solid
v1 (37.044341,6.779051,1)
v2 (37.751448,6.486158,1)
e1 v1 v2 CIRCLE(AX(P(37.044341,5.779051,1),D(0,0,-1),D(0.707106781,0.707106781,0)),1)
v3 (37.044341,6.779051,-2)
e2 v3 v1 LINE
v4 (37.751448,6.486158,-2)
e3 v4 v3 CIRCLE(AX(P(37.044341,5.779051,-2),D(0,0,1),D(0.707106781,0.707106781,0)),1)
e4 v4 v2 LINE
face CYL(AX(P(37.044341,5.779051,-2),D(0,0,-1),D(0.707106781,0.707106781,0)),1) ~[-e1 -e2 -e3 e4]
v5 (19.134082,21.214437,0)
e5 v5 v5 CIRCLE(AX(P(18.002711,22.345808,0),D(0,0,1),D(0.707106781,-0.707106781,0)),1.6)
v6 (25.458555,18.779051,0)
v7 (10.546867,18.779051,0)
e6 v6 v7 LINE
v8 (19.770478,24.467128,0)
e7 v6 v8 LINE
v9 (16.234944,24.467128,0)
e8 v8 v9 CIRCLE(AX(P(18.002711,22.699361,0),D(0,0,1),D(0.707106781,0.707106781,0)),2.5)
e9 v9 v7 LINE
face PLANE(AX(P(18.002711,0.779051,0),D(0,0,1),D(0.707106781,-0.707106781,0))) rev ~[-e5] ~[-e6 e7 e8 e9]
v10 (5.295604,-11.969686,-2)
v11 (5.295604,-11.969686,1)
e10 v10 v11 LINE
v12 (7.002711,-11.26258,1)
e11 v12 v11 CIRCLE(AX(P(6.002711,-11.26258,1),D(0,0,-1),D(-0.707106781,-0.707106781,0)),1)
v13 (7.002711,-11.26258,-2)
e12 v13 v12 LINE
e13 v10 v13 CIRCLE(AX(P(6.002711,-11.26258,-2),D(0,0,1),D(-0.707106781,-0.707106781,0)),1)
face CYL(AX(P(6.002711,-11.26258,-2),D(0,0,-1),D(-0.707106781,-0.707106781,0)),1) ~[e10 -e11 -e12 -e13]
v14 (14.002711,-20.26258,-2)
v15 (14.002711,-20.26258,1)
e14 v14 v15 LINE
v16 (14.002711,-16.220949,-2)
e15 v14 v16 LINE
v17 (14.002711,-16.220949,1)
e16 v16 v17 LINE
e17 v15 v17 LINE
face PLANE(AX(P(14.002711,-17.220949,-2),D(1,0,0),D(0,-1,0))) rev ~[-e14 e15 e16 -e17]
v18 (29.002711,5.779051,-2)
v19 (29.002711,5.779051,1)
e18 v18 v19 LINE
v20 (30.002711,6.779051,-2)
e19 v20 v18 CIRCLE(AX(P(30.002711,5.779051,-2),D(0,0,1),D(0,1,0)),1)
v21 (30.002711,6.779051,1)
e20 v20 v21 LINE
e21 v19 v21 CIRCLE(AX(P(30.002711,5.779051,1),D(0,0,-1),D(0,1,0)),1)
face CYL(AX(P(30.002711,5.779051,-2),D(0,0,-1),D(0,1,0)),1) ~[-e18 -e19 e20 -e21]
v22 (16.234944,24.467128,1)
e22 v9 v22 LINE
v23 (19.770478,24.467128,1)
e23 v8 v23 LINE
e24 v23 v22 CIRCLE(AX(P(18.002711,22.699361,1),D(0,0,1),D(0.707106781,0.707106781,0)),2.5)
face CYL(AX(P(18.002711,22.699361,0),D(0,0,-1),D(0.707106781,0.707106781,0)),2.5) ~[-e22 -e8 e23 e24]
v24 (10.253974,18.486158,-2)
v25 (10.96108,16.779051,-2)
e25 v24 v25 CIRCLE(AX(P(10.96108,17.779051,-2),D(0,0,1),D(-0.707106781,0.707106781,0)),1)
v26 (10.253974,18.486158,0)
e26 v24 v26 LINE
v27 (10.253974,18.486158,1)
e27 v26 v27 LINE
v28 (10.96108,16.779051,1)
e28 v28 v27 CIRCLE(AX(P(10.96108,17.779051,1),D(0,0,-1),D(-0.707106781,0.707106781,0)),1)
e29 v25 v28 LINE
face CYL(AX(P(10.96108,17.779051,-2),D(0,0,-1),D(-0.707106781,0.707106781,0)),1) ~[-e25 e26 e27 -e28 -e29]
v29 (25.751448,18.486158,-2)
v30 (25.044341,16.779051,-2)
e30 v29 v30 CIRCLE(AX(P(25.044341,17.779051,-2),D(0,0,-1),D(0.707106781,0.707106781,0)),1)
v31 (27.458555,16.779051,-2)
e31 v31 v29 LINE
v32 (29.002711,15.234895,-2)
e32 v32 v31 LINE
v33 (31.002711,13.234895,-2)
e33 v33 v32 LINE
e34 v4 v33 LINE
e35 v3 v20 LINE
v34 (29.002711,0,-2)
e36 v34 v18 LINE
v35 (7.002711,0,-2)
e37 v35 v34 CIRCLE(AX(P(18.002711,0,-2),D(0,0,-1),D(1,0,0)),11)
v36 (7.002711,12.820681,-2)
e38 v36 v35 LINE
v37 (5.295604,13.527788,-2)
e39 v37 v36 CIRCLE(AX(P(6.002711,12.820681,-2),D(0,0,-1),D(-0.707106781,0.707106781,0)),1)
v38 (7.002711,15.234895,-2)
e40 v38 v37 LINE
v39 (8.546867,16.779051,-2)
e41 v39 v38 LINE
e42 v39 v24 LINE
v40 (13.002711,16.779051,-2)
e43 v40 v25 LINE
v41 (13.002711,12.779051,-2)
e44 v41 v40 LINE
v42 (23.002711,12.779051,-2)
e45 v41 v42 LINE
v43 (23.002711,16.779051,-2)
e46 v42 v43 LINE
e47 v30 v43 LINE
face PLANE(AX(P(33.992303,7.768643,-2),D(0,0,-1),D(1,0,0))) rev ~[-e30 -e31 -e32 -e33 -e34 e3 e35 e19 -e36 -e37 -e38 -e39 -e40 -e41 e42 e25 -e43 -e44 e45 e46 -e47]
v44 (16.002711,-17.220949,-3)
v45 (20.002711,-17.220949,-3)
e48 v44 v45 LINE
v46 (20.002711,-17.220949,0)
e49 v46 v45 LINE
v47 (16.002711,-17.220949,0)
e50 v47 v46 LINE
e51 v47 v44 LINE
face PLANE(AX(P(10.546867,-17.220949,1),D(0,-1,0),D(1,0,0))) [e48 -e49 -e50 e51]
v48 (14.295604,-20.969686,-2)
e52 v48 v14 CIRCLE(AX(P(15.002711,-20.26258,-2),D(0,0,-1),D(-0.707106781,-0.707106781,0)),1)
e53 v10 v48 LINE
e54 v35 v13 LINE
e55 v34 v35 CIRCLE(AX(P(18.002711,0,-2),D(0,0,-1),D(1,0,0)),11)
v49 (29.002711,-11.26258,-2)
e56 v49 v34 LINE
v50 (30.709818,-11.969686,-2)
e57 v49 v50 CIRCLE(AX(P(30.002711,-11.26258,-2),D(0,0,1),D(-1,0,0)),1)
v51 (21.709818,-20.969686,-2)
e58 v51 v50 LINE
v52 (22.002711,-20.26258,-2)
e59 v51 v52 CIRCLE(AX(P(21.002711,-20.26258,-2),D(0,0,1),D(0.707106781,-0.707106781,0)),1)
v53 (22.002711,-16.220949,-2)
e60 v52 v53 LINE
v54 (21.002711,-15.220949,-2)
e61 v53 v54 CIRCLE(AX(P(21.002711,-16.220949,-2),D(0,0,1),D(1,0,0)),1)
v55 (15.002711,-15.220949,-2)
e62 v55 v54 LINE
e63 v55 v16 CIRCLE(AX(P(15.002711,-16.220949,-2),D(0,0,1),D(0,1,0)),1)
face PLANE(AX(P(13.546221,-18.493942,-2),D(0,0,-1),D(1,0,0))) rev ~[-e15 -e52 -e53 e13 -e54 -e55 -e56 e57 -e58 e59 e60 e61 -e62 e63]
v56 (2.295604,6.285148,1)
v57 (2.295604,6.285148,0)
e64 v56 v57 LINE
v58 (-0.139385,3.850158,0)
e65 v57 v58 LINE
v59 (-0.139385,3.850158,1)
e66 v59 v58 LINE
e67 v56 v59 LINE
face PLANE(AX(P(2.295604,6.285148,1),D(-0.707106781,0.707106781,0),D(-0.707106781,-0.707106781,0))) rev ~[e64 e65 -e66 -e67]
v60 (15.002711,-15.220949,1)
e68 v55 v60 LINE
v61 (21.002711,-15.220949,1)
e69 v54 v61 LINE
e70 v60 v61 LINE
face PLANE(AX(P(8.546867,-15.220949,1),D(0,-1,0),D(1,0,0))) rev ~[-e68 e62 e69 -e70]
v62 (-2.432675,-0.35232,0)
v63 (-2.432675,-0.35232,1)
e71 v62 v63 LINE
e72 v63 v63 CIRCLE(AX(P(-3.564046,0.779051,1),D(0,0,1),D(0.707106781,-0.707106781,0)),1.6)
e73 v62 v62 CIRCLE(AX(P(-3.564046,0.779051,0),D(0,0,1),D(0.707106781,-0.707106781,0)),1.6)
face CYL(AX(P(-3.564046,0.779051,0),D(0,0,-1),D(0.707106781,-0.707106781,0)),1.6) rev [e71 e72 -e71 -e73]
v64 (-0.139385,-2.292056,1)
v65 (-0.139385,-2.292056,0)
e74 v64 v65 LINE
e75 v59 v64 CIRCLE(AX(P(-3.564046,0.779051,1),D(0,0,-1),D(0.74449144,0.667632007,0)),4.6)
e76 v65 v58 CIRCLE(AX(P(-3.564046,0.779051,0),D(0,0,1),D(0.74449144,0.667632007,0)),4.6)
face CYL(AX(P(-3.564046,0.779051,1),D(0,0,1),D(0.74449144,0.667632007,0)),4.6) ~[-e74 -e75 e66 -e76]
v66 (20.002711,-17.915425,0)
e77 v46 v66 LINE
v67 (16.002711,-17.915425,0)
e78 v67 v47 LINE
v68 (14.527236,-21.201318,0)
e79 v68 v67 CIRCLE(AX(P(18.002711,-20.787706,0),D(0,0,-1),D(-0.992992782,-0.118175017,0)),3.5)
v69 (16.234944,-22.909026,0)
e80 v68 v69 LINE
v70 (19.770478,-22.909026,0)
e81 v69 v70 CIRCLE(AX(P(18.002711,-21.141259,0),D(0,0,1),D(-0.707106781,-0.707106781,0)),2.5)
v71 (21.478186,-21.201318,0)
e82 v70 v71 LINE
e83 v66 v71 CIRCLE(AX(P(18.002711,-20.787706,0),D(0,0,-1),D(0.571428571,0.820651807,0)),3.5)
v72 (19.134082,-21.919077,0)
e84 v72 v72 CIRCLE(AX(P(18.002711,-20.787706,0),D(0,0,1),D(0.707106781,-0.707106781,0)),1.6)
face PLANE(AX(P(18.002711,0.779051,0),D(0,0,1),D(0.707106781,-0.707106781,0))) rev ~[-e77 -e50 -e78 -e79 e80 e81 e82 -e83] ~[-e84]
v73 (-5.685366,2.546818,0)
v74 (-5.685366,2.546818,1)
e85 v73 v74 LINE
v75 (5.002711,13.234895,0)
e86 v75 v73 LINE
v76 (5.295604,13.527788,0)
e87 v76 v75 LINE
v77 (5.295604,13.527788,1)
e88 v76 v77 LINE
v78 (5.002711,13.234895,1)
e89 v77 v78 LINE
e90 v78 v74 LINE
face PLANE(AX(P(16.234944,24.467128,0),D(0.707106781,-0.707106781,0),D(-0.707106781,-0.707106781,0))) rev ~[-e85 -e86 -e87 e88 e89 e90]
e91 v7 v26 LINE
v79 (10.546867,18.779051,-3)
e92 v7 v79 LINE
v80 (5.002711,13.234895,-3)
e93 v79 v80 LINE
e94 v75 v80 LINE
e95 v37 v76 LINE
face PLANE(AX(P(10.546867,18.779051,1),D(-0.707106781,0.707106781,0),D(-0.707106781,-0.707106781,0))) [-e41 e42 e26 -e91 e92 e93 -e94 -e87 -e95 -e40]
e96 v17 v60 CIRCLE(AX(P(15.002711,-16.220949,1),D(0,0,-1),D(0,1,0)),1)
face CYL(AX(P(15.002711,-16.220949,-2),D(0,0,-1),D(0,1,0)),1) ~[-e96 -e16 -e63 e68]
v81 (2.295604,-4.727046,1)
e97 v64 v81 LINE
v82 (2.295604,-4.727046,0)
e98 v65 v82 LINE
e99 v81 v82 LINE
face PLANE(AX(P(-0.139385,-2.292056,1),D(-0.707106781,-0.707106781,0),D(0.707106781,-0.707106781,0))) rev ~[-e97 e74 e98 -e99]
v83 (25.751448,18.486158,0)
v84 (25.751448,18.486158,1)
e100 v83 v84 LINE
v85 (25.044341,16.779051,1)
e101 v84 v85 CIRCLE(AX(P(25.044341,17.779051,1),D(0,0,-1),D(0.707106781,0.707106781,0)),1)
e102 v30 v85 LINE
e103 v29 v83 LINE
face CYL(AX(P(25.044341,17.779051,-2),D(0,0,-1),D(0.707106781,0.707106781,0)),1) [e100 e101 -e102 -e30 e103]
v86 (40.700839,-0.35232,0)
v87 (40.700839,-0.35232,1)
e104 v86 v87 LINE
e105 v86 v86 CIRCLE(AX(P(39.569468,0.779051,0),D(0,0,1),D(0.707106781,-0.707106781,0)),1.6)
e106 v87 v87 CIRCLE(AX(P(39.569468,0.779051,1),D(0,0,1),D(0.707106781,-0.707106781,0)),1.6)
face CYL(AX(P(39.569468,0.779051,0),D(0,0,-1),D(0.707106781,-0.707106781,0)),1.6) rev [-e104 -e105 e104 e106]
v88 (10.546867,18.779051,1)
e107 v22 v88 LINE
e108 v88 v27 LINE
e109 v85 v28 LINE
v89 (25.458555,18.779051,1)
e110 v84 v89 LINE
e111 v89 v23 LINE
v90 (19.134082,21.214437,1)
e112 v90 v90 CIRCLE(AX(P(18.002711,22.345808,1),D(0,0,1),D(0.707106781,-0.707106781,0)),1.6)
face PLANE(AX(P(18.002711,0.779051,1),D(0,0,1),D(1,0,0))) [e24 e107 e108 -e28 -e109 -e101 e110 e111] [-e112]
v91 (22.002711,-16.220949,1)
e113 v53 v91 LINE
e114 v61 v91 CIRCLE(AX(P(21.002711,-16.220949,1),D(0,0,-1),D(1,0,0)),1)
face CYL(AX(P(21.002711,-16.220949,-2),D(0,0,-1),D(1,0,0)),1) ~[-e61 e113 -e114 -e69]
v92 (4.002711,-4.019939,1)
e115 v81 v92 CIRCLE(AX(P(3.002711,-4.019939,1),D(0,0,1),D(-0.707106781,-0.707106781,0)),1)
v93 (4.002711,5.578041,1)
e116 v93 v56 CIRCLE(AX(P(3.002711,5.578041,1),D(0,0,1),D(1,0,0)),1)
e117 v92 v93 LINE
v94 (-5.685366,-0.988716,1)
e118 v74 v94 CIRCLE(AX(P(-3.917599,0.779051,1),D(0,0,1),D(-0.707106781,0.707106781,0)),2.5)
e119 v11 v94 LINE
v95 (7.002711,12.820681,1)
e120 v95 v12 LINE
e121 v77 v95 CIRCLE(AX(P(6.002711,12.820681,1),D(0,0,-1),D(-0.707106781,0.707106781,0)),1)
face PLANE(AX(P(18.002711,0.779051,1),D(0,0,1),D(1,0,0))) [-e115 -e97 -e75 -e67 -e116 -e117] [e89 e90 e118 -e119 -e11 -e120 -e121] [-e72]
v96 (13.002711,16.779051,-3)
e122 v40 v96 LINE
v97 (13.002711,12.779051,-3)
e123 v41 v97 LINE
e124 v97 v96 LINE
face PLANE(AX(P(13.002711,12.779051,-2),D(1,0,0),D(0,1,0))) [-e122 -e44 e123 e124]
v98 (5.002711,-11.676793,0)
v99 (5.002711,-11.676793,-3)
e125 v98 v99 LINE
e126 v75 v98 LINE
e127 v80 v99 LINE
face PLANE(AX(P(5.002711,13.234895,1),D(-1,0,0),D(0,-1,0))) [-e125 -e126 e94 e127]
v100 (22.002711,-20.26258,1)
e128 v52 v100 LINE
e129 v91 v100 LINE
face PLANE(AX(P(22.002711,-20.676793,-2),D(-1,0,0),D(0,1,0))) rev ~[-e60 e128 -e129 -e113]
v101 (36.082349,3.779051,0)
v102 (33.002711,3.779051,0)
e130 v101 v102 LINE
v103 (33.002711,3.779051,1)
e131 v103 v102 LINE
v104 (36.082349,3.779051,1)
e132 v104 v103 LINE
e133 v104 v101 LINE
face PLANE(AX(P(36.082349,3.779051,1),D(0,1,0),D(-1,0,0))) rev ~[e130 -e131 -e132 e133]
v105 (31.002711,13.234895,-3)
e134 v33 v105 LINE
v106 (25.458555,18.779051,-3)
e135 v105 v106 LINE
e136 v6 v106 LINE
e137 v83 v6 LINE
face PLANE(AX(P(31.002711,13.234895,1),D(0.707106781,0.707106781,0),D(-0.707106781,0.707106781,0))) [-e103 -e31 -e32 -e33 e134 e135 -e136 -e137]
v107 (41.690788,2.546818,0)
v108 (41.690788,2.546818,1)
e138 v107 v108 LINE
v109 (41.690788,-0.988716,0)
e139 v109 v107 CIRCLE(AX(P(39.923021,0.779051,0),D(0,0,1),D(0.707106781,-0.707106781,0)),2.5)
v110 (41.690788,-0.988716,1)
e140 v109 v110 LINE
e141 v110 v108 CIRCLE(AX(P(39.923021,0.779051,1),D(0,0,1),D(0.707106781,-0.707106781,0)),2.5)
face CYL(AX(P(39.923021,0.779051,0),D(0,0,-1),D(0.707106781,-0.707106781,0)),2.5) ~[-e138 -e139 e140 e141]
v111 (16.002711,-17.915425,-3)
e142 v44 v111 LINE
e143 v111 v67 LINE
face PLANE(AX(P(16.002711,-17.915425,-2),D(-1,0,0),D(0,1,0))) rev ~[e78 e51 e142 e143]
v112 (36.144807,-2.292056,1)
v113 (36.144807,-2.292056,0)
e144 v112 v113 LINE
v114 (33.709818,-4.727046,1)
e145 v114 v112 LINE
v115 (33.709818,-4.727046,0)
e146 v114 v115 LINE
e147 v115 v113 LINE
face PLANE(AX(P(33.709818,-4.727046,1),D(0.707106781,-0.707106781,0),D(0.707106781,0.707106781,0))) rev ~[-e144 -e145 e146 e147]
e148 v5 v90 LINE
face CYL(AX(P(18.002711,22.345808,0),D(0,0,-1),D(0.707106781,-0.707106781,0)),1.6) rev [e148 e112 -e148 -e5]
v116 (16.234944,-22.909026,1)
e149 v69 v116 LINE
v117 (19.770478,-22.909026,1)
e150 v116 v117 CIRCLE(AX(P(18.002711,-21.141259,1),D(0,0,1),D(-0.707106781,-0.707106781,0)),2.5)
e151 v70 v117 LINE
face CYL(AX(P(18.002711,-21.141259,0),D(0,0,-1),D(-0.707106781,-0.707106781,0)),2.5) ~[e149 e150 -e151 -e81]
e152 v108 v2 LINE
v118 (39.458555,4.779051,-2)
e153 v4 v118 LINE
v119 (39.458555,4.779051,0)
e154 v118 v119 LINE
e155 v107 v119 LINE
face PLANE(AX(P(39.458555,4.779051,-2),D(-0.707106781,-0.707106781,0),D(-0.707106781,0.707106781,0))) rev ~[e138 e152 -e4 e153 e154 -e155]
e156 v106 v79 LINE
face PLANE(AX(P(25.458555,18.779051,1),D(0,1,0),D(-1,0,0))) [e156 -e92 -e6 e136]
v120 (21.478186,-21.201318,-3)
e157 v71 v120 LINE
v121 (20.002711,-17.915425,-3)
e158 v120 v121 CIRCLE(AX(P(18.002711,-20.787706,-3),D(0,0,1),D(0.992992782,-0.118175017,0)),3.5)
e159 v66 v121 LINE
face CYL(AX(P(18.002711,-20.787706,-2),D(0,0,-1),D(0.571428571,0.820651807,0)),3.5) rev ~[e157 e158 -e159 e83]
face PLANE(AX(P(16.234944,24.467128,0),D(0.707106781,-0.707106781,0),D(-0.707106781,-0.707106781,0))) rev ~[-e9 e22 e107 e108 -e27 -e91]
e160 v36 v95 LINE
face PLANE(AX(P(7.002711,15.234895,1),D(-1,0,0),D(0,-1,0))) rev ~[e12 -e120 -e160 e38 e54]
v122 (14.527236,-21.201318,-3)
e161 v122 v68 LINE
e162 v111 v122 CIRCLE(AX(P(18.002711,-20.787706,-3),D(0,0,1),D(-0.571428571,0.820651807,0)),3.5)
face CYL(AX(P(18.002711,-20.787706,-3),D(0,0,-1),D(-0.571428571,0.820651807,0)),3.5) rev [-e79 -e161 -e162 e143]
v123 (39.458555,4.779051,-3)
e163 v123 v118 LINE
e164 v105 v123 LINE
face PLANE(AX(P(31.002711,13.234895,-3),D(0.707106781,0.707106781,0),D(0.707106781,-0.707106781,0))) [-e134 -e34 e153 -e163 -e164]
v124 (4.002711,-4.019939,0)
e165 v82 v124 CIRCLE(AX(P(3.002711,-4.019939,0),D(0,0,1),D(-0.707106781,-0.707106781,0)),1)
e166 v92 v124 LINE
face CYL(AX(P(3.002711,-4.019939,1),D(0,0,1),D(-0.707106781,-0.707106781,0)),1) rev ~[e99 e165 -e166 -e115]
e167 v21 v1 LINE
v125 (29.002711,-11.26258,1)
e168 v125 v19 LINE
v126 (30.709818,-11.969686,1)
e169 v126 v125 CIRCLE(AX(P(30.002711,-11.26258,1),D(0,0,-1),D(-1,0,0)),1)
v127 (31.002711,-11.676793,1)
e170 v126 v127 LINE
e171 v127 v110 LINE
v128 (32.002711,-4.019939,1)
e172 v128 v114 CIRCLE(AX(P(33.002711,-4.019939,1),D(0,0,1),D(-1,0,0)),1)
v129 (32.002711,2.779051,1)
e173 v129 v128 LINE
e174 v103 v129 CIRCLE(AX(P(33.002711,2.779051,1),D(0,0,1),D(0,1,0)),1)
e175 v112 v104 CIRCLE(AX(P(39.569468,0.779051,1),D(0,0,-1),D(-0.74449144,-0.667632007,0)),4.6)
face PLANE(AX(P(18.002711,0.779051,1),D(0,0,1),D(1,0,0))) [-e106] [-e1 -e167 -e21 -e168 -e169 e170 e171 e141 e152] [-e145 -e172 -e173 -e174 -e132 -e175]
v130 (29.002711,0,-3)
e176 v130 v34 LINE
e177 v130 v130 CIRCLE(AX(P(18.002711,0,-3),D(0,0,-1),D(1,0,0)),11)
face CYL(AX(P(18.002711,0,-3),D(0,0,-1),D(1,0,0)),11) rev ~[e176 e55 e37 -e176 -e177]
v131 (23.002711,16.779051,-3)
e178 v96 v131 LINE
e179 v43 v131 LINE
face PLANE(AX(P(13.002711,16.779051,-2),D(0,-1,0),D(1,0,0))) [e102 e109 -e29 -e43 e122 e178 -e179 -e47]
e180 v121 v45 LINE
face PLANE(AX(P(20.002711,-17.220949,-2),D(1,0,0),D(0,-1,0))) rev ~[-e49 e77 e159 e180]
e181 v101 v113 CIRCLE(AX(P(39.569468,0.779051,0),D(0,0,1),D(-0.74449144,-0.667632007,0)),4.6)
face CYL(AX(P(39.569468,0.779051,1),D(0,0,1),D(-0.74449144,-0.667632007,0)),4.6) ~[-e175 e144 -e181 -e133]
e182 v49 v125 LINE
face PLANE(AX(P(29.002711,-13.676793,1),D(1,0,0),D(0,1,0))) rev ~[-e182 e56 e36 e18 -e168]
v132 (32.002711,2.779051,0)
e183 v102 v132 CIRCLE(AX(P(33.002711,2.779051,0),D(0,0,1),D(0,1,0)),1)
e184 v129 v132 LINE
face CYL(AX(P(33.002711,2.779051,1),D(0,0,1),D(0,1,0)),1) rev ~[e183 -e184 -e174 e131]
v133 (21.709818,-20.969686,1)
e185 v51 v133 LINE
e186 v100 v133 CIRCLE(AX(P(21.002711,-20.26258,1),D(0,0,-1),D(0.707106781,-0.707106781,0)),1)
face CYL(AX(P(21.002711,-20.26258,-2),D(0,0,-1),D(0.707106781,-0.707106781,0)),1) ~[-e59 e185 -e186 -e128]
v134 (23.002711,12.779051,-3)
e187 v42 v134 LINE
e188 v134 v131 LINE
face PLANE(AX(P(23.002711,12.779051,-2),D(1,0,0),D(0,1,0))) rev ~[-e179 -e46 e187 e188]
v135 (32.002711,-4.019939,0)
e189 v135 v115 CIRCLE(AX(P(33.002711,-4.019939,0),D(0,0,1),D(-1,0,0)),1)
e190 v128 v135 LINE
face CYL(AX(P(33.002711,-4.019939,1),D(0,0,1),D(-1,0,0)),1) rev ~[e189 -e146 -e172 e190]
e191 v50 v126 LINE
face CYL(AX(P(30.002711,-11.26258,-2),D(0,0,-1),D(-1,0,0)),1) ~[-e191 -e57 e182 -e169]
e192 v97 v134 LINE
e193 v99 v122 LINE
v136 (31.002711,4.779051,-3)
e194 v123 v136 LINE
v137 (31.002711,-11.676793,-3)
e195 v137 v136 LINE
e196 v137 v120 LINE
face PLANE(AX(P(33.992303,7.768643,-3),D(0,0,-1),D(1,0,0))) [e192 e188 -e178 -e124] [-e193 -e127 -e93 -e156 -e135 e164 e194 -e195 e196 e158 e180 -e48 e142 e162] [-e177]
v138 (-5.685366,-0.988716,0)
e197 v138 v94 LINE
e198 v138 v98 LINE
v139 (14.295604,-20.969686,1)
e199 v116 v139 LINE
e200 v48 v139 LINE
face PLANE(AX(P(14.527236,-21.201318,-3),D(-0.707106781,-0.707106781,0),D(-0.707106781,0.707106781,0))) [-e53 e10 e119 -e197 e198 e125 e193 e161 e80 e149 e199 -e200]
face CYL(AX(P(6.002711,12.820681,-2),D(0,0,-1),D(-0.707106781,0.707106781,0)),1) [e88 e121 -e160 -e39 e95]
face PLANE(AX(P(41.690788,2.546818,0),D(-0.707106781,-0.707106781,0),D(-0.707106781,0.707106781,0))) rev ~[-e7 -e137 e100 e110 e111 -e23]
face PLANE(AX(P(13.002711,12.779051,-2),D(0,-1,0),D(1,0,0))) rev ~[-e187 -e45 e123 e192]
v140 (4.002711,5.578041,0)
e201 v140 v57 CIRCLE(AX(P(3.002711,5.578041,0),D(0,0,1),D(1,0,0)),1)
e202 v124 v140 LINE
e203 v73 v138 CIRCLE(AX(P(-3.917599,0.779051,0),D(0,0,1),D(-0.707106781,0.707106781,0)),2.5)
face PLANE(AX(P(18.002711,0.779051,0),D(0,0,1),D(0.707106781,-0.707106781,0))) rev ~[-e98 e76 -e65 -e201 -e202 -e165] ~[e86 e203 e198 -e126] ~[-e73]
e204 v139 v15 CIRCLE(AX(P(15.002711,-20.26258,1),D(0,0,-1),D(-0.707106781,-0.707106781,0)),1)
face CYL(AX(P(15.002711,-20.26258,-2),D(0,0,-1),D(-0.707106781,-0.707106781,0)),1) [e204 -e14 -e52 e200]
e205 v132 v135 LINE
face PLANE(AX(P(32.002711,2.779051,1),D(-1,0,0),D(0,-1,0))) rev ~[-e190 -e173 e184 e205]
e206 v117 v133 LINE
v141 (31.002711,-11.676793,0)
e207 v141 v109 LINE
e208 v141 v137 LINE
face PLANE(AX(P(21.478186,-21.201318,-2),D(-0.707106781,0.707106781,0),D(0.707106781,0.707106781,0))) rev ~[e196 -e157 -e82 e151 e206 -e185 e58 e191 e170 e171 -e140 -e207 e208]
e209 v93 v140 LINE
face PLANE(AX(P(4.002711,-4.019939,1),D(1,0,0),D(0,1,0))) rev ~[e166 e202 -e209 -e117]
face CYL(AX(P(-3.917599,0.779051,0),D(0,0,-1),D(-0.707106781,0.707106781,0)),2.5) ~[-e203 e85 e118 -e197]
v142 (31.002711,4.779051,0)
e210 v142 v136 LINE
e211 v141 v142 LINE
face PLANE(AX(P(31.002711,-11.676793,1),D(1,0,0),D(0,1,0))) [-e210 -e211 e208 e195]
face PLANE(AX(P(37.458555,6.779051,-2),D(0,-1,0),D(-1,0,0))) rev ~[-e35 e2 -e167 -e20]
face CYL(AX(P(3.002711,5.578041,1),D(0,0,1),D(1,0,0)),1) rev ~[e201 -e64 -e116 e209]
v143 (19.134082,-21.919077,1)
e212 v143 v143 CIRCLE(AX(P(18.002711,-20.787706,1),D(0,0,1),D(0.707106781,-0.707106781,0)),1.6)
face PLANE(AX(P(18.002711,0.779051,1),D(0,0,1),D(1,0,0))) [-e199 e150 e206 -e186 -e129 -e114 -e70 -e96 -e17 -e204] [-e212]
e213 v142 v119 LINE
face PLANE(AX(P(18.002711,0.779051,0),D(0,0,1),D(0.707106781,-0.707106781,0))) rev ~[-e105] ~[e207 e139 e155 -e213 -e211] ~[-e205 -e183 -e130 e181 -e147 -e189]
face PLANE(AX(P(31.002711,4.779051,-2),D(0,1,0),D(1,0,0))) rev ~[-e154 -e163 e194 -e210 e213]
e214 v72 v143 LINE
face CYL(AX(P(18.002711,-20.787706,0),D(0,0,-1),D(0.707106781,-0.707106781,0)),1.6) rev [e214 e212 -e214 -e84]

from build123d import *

# Parameters (mm, degrees)
F0_R         = 1.6
F1_DEPTH     = 1
F2_ANGLE     = 45
F3_DEPTH     = 4
F5_DEPTH     = 3
F20_DEPTH    = 3
F7_R         = 11
F8_DEPTH     = 25
F9_DEPTH     = 3
F10_W        = 10
F10_H        = 4
F11_DEPTH    = 25
F13_DEPTH    = 25
F14_DEPTH    = 1
F15_DEPTH    = 2
F16_DEPTH    = 1
F17_DEPTH    = 2
F18_T1_DEPTH = 5.5
F18_T3_DEPTH = 9.0355339059
F18_T5_DEPTH = 4.0355339059


# Not quite as in the source:
# - a fillet or chamfer that OpenCascade refuses, or shapes differently, is made with other operations: its cross-section is extruded or revolved along the edge and cut away or added


with BuildPart() as f1:
    # F0 (on Top) → F1 (new body)
    with BuildSketch(Plane.XY):
        with BuildLine():
            Line((-14.7650561035, -22.9090262799), (16.2349438965, -22.9090262799))
            ThreePointArc((16.2349438965, -22.9090262799), (18.0027108495, -22.1767932329), (18.7349438965, -20.4090262799))
            Line((18.7349438965, -20.4090262799), (18.7349438965, 10.5909737201))
            ThreePointArc((18.7349438965, 10.5909737201), (18.0027108495, 12.3587406731), (16.2349438965, 13.0909737201))
            Line((16.2349438965, 13.0909737201), (-14.7650561035, 13.0909737201))
            ThreePointArc((-14.7650561035, 13.0909737201), (-16.5328230564, 12.3587406731), (-17.2650561035, 10.5909737201))
            Line((-17.2650561035, 10.5909737201), (-17.2650561035, -20.4090262799))
            ThreePointArc((-17.2650561035, -20.4090262799), (-16.5328230564, -22.1767932329), (-14.7650561035, -22.9090262799))
        make_face()
        with Locations((-14.5150561035, -20.1590262799)):
            Circle(F0_R, mode=Mode.SUBTRACT)
        with Locations((15.9849438965, -20.1590262799)):
            Circle(F0_R, mode=Mode.SUBTRACT)
        with Locations((-14.5150561035, 10.3409737201)):
            Circle(F0_R, mode=Mode.SUBTRACT)
        with Locations((15.9849438965, 10.3409737201)):
            Circle(F0_R, mode=Mode.SUBTRACT)
    extrude(amount=F1_DEPTH)


with BuildPart() as f1_1:
    # F2: moved
    add(f1.part.rotate(Axis((16.2349438965, -22.9090262799, 0.5), (0, 0, -1)), F2_ANGLE))

    # F19 (on face) → F3 (join)
    with BuildSketch(Plane.XY.offset(1)):
        Polygon((10.5468667268, -17.2209491102), (25.4585549722, -17.2209491102), (31.0027108495, -11.6767932329), (31.0027108495, 13.2348950126), (25.4585549722, 18.7790508898), (10.5468667268, 18.7790508898), (5.0027108495, 13.2348950126), (5.0027108495, -11.6767932329), align=None)
    extrude(amount=-F3_DEPTH)

    # F4 (on face) → F5 (cut)
    with BuildSketch(Plane.XY.offset(1)):
        Polygon((8.5468667268, -15.2209491102), (27.4585549722, -15.2209491102), (29.0027108495, -13.6767932329), (29.0027108495, 15.2348950126), (27.4585549722, 16.7790508898), (8.5468667268, 16.7790508898), (7.0027108495, 15.2348950126), (7.0027108495, -13.6767932329), align=None)
    extrude(amount=-F5_DEPTH, mode=Mode.SUBTRACT)

    # F6 (on face) → F20 (cut, through all)
    with BuildSketch(Plane.XY.offset(1)):
        Polygon((14.0027108495, -20.6767932329), (14.0027108495, -15.2209491102), (8.5468667268, -15.2209491102), align=None)
        Polygon((27.4585549722, -15.2209491102), (22.0027108495, -15.2209491102), (22.0027108495, -20.6767932329), align=None)
    extrude(amount=-F20_DEPTH, mode=Mode.SUBTRACT)

    # F7 (on face) → F8 (cut)
    with BuildSketch(Plane(origin=(0, 0, -3), x_dir=(1, 0, 0), z_dir=(0, 0, -1))):
        with Locations((18.0027108495, 0)):
            Circle(F7_R)
    extrude(amount=-F8_DEPTH, mode=Mode.SUBTRACT)

    # F21 (on face) → F9 (cut, through all)
    with BuildSketch(Plane.XY.offset(1)):
        Polygon((29.0027108495, 15.2348950126), (29.0027108495, 6.7790508898), (37.4585549722, 6.7790508898), align=None)
    extrude(amount=-F9_DEPTH, mode=Mode.SUBTRACT)

    # F10 (on face) → F11 (cut)
    with BuildSketch(Plane.XY.offset(-2)):
        with Locations((18.0027108495, 14.7790508898)):
            Rectangle(F10_W, F10_H)
    extrude(amount=-F11_DEPTH, mode=Mode.SUBTRACT)

    # F12 (on face) + F22 (on face) → F13 (cut)
    with BuildSketch(Plane.XY.offset(1)):
        with BuildLine():
            ThreePointArc((36.1448070539, -2.2920563414), (34.9697110872, 0.7317293655), (36.0823485209, 3.7790508898))
            Line((36.0823485209, 3.7790508898), (33.0027108495, 3.7790508898))
            ThreePointArc((33.0027108495, 3.7790508898), (32.2956040683, 3.486157671), (32.0027108495, 2.7790508898))
            Line((32.0027108495, 2.7790508898), (32.0027108495, -4.0199389834))
            ThreePointArc((32.0027108495, -4.0199389834), (32.6200274171, -4.9438185159), (33.7098176307, -4.7270457646))
            Line((33.7098176307, -4.7270457646), (36.1448070539, -2.2920563414))
        make_face()
    with BuildSketch(Plane.XY.offset(1)):
        with BuildLine():
            ThreePointArc((-0.1393853549, 3.8501581211), (1.0359540233, 0.7790508898), (-0.1393853549, -2.2920563414))
            Line((-0.1393853549, -2.2920563414), (2.2956040683, -4.7270457646))
            ThreePointArc((2.2956040683, -4.7270457646), (3.3853942819, -4.9438185159), (4.0027108495, -4.0199389834))
            Line((4.0027108495, -4.0199389834), (4.0027108495, 5.5780407631))
            ThreePointArc((4.0027108495, 5.5780407631), (3.3853942819, 6.5019202956), (2.2956040683, 6.2851475443))
            Line((2.2956040683, 6.2851475443), (-0.1393853549, 3.8501581211))
        make_face()
    extrude(amount=-F13_DEPTH, mode=Mode.SUBTRACT)

    # F23 (on face) → F14 (join, through all)
    with BuildSketch(Plane(origin=(0, 0, -3), x_dir=(1, 0, 0), z_dir=(0, 0, -1))):
        with BuildLine():
            Line((14.527236112, 21.2013184954), (10.5468667268, 17.2209491102))
            Line((10.5468667268, 17.2209491102), (16.0027108495, 17.2209491102))
            Line((16.0027108495, 17.2209491102), (16.0027108495, 17.9154246131))
            ThreePointArc((16.0027108495, 17.9154246131), (14.809831185, 19.3539976507), (14.527236112, 21.2013184954))
        make_face()
        with BuildLine():
            Line((20.0027108495, 17.9154246131), (20.0027108495, 17.2209491102))
            Line((20.0027108495, 17.2209491102), (25.4585549722, 17.2209491102))
            Line((25.4585549722, 17.2209491102), (21.478185587, 21.2013184954))
            ThreePointArc((21.478185587, 21.2013184954), (21.195590514, 19.3539976507), (20.0027108495, 17.9154246131))
        make_face()
    extrude(amount=-F14_DEPTH)

    # F24 (on face) → F15 (join, through all)
    with BuildSketch(Plane.XY.offset(-2)):
        with BuildLine():
            Line((22.0027108495, -20.6767932329), (22.0027108495, -17.2209491102))
            Line((22.0027108495, -17.2209491102), (20.0027108495, -17.2209491102))
            Line((20.0027108495, -17.2209491102), (20.0027108495, -17.9154246131))
            ThreePointArc((20.0027108495, -17.9154246131), (21.195590514, -19.3539976507), (21.478185587, -21.2013184954))
            Line((21.478185587, -21.2013184954), (22.0027108495, -20.6767932329))
        make_face()
        with BuildLine():
            Line((16.0027108495, -17.2209491102), (14.0027108495, -17.2209491102))
            Line((14.0027108495, -17.2209491102), (14.0027108495, -20.6767932329))
            Line((14.0027108495, -20.6767932329), (14.527236112, -21.2013184954))
            ThreePointArc((14.527236112, -21.2013184954), (14.809831185, -19.3539976507), (16.0027108495, -17.9154246131))
            Line((16.0027108495, -17.9154246131), (16.0027108495, -17.2209491102))
        make_face()
    extrude(amount=F15_DEPTH)

    # F25 (on face) → F16 (join, through all)
    with BuildSketch(Plane(origin=(0, 0, -3), x_dir=(1, 0, 0), z_dir=(0, 0, -1))):
        Polygon((31.0027108495, -4.7790508898), (31.0027108495, -13.2348950126), (39.4585549722, -4.7790508898), align=None)
    extrude(amount=-F16_DEPTH)

    # F26 (on face) → F17 (join, through all)
    with BuildSketch(Plane.XY.offset(-2)):
        Polygon((37.4585549722, 6.7790508898), (31.0027108495, 6.7790508898), (31.0027108495, 4.7790508898), (39.4585549722, 4.7790508898), align=None)
    extrude(amount=F17_DEPTH)

    # F18: fillet of radius 1 on 11 edges, made by hand

    # F18_s2 → F18_t1 (cut)
    with BuildSketch(Plane.XY.offset(-2)):
        with BuildLine():
            ThreePointArc((22.0027108495, -16.2209491102), (21.7098176307, -15.513842329), (21.0027108495, -15.2209491102))
            Line((21.0027108495, -15.2209491102), (22.0027108495, -15.2209491102))
            Line((22.0027108495, -15.2209491102), (22.0027108495, -16.2209491102))
        make_face()
        with BuildLine():
            ThreePointArc((15.0027108495, -15.2209491102), (14.2956040683, -15.513842329), (14.0027108495, -16.2209491102))
            Line((14.0027108495, -16.2209491102), (14.0027108495, -15.2209491102))
            Line((14.0027108495, -15.2209491102), (15.0027108495, -15.2209491102))
        make_face()
        with BuildLine():
            ThreePointArc((30.0027108495, 6.7790508898), (29.2956040683, 6.486157671), (29.0027108495, 5.7790508898))
            Line((29.0027108495, 5.7790508898), (29.0027108495, 6.7790508898))
            Line((29.0027108495, 6.7790508898), (30.0027108495, 6.7790508898))
        make_face()
    extrude(amount=F18_T1_DEPTH, mode=Mode.SUBTRACT)

    # F18_s4 → F18_t3 (cut)
    with BuildSketch(Plane.XY.offset(-2)):
        with BuildLine():
            ThreePointArc((5.2956040683, -11.9696864517), (6.3853942819, -12.186459203), (7.0027108495, -11.2625796705))
            Line((7.0027108495, -11.2625796705), (7.0027108495, -13.6767932329))
            Line((7.0027108495, -13.6767932329), (5.2956040683, -11.9696864517))
        make_face()
        with BuildLine():
            ThreePointArc((5.2956040683, 13.5277882314), (6.3853942819, 13.7445609827), (7.0027108495, 12.8206814502))
            Line((7.0027108495, 12.8206814502), (7.0027108495, 15.2348950126))
            Line((7.0027108495, 15.2348950126), (5.2956040683, 13.5277882314))
        make_face()
        with BuildLine():
            ThreePointArc((29.0027108495, -11.2625796705), (29.6200274171, -12.186459203), (30.7098176307, -11.9696864517))
            Line((30.7098176307, -11.9696864517), (29.0027108495, -13.6767932329))
            Line((29.0027108495, -13.6767932329), (29.0027108495, -11.2625796705))
        make_face()
        with BuildLine():
            ThreePointArc((10.253973508, 18.486157671), (10.0372007566, 17.3963674575), (10.9610802892, 16.7790508898))
            Line((10.9610802892, 16.7790508898), (8.5468667268, 16.7790508898))
            Line((8.5468667268, 16.7790508898), (10.253973508, 18.486157671))
        make_face()
        with BuildLine():
            ThreePointArc((25.751448191, 18.486157671), (25.9682209424, 17.3963674575), (25.0443414098, 16.7790508898))
            Line((25.0443414098, 16.7790508898), (27.4585549722, 16.7790508898))
            Line((27.4585549722, 16.7790508898), (25.751448191, 18.486157671))
        make_face()
    extrude(amount=F18_T3_DEPTH, mode=Mode.SUBTRACT)

    # F18_s6 → F18_t5 (cut)
    with BuildSketch(Plane.XY.offset(-2)):
        with BuildLine():
            ThreePointArc((14.2956040683, -20.9696864517), (14.078831317, -20.6452631029), (14.0027108495, -20.2625796705))
            Line((14.0027108495, -20.2625796705), (14.0027108495, -20.6767932329))
            Line((14.0027108495, -20.6767932329), (14.2956040683, -20.9696864517))
        make_face()
        with BuildLine():
            ThreePointArc((21.7098176307, -20.9696864517), (21.926590382, -20.6452631029), (22.0027108495, -20.2625796705))
            Line((22.0027108495, -20.2625796705), (22.0027108495, -20.6767932329))
            Line((22.0027108495, -20.6767932329), (21.7098176307, -20.9696864517))
        make_face()
        with BuildLine():
            ThreePointArc((37.751448191, 6.486157671), (37.4270248422, 6.7029304224), (37.0443414098, 6.7790508898))
            Line((37.0443414098, 6.7790508898), (37.4585549722, 6.7790508898))
            Line((37.4585549722, 6.7790508898), (37.751448191, 6.486157671))
        make_face()
    extrude(amount=F18_T5_DEPTH, mode=Mode.SUBTRACT)


solid = f1_1.part
